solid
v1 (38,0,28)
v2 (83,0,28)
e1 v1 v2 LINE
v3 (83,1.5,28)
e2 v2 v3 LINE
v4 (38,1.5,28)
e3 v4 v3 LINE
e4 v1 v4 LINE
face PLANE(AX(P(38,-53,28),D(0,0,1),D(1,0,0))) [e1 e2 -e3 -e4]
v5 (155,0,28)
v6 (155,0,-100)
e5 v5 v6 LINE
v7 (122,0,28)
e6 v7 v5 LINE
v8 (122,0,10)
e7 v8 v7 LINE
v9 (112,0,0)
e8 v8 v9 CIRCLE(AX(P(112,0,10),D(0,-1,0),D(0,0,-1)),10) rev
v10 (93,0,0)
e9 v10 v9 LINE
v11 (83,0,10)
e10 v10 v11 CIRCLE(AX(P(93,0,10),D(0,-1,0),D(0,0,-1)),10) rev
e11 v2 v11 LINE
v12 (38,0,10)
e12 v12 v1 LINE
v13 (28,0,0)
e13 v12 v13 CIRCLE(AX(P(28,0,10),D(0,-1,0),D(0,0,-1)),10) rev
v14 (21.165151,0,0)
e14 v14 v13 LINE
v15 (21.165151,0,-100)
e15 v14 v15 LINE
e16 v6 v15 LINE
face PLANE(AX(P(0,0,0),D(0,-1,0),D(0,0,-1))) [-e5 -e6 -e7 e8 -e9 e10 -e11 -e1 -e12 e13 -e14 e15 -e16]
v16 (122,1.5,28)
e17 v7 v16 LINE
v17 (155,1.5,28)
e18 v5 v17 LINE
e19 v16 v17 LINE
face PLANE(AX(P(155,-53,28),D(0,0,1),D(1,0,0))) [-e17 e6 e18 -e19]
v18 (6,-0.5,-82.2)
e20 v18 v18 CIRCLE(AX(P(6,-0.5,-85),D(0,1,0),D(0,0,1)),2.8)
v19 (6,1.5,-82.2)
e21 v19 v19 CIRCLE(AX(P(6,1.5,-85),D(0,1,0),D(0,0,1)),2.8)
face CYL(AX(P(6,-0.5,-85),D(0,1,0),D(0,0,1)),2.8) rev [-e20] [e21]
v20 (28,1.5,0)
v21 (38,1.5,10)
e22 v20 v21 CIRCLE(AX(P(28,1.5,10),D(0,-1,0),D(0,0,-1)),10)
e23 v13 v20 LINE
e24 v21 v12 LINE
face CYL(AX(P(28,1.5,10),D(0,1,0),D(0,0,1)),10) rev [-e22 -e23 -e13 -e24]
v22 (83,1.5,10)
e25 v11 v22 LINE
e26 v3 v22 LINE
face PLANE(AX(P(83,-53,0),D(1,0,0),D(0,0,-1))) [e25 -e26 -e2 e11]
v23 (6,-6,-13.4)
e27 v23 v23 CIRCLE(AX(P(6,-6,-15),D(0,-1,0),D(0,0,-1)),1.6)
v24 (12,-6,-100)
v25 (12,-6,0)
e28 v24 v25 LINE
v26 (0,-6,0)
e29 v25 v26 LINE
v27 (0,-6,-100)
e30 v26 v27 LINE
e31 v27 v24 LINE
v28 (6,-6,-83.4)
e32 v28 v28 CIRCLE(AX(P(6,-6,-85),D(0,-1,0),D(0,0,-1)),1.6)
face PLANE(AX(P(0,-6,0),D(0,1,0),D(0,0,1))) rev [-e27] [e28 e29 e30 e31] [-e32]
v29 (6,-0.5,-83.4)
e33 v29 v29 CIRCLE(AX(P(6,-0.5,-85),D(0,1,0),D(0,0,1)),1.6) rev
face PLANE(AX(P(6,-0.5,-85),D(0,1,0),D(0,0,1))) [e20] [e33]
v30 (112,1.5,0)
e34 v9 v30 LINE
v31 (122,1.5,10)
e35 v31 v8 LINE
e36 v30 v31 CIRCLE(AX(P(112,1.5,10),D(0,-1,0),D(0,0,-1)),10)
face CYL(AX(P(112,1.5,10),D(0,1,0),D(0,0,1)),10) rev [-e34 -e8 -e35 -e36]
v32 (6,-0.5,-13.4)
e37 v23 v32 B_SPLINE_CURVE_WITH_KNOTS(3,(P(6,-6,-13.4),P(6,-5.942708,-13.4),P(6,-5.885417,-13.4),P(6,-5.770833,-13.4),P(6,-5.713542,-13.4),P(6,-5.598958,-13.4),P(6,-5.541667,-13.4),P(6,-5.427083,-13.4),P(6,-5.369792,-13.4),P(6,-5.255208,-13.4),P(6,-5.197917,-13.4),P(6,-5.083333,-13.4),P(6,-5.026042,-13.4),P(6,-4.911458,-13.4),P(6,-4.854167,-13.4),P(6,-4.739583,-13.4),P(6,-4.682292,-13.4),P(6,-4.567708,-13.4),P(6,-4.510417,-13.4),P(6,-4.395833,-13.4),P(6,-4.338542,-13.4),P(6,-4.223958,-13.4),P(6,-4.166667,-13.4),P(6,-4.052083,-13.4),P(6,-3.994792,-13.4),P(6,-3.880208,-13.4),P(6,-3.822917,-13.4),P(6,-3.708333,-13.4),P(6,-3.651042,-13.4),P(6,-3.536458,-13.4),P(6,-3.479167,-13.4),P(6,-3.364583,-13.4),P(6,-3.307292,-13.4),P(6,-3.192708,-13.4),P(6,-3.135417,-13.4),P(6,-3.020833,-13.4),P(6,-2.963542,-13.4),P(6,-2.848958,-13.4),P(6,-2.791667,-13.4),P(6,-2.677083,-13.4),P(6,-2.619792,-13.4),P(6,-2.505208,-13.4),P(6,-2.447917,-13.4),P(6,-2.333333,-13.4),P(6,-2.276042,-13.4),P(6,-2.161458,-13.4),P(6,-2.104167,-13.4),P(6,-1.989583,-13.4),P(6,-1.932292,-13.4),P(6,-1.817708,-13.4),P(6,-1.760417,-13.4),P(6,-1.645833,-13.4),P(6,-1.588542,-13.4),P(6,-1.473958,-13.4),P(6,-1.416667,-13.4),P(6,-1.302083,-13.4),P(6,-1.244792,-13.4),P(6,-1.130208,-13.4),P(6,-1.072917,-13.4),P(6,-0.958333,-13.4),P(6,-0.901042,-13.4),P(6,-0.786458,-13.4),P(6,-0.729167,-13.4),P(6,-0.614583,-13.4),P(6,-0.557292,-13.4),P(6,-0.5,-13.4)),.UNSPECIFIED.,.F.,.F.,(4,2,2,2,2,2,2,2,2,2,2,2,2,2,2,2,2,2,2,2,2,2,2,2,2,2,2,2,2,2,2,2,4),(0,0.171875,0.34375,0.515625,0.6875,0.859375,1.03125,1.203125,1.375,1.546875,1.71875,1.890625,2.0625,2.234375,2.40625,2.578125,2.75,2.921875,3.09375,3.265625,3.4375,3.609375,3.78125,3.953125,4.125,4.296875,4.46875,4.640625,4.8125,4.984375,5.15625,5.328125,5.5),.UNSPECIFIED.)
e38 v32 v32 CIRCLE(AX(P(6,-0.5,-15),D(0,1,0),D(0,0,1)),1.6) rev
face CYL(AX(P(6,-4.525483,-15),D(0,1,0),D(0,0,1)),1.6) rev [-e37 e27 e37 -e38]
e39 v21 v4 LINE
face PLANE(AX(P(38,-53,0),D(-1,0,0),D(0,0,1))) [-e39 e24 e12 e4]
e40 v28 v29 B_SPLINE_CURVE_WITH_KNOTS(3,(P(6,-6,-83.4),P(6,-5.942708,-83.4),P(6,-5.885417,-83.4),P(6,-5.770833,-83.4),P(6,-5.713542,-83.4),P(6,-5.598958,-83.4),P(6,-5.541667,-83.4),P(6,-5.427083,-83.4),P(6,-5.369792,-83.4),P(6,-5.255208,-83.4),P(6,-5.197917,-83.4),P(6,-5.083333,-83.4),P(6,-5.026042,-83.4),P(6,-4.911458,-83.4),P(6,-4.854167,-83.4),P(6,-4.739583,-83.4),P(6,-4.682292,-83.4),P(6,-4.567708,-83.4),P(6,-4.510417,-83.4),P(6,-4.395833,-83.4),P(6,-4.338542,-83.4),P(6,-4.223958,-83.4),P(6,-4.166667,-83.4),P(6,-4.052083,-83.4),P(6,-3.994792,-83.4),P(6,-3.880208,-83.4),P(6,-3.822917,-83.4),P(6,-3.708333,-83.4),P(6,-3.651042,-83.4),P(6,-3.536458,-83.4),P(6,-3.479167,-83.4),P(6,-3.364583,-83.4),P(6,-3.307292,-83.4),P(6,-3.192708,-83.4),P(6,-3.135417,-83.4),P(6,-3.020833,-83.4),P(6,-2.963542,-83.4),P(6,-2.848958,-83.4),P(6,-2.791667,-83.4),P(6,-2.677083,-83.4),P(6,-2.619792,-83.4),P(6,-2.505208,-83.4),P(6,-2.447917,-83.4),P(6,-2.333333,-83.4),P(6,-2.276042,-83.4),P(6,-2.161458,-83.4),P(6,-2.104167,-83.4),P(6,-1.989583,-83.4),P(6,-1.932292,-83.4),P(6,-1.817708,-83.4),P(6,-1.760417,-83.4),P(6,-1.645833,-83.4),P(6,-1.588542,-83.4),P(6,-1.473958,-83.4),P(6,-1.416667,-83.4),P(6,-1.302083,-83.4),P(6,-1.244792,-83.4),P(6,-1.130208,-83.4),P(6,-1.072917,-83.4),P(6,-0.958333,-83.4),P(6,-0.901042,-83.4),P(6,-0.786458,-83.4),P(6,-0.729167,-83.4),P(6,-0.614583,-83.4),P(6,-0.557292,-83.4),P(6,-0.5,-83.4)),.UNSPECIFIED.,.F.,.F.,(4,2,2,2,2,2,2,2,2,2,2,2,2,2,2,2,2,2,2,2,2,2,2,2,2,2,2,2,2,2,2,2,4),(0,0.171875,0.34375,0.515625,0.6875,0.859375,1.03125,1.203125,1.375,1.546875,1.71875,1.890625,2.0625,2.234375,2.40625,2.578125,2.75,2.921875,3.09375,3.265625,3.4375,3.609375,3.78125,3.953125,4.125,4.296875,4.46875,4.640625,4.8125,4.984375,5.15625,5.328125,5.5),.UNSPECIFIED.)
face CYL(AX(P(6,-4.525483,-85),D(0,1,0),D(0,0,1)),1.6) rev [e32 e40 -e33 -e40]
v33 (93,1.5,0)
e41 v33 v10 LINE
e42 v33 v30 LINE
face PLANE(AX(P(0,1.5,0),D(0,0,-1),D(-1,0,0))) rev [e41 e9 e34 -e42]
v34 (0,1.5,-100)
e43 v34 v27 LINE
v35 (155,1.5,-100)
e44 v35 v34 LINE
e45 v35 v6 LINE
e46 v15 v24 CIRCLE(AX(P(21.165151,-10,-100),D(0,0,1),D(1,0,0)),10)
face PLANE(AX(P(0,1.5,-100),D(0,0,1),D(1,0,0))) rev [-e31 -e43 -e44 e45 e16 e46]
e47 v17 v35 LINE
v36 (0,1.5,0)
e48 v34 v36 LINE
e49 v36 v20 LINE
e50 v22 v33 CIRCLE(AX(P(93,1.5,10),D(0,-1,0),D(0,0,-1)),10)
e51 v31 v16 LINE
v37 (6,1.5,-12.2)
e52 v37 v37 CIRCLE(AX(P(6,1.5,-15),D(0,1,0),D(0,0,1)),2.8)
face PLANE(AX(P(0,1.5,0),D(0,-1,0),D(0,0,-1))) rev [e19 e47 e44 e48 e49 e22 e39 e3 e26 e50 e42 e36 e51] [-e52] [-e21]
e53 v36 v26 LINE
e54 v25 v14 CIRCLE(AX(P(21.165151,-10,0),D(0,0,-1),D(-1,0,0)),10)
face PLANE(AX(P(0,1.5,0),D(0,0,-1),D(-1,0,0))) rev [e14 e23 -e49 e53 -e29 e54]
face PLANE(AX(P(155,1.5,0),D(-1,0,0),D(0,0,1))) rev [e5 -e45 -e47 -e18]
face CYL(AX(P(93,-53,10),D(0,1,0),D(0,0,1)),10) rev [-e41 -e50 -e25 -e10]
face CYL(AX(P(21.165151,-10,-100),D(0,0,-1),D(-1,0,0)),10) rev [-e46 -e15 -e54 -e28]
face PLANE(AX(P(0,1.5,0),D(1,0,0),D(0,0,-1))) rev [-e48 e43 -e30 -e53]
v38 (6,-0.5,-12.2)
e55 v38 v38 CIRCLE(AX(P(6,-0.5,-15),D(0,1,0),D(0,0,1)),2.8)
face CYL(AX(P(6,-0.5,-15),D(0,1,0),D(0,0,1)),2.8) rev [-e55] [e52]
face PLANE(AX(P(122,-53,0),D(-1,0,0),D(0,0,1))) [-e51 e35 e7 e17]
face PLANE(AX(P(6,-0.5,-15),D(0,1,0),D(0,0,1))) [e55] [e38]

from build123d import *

# Parameters (mm, degrees)
CROQUIS1_W              = 155
CROQUIS1_H              = 100
SALIENTE_EXTRUIR1_DEPTH = 1.5
CROQUIS2_R              = 1.6
CORTAR_EXTRUIR1_DEPTH   = 1.5
CROQUIS3_W              = 12
CROQUIS3_H              = 100
CROQUIS3_R              = 1.6
SALIENTE_EXTRUIR2_DEPTH = 6
CROQUIS4_W              = 45
CROQUIS4_H              = 28
CROQUIS4_W_2            = 33
SALIENTE_EXTRUIR3_DEPTH = 1.5
REDONDEO1_R             = 10
REDONDEO2_R             = 10
CROQUIS5_R              = 2.8
CORTAR_EXTRUIR2_DEPTH   = 2


with BuildPart() as part:
    # Croquis1 → Saliente-Extruir1 (new body)
    with BuildSketch(Plane(origin=(0, 0, 0), x_dir=(1, 0, 0), z_dir=(0, 1, 0))):
        with Locations((77.5, 50)):
            Rectangle(CROQUIS1_W, CROQUIS1_H)
    extrude(amount=SALIENTE_EXTRUIR1_DEPTH)

    # Croquis2 → Cortar-Extruir1 (cut)
    with BuildSketch(Plane(origin=(0, 1.5, 0), x_dir=(1, 0, 0), z_dir=(0, 1, 0))):
        with Locations(Location((6, 85, 0), (0, 0, 270))):
            Circle(CROQUIS2_R)
        with Locations(Location((6, 15, 0), (0, 0, 270))):
            Circle(CROQUIS2_R)
    extrude(amount=-CORTAR_EXTRUIR1_DEPTH, mode=Mode.SUBTRACT)

    # Croquis3 → Saliente-Extruir2 (add)
    with BuildSketch(Plane.XZ):
        with Locations((6, -50)):
            Rectangle(CROQUIS3_W, CROQUIS3_H)
        with Locations(Location((6, -15, 0), (0, 0, 90))):
            Circle(CROQUIS3_R, mode=Mode.SUBTRACT)
        with Locations(Location((6, -85, 0), (0, 0, 90))):
            Circle(CROQUIS3_R, mode=Mode.SUBTRACT)
    extrude(amount=SALIENTE_EXTRUIR2_DEPTH)

    # Croquis4 → Saliente-Extruir3 (add)
    with BuildSketch(Plane(origin=(0, 1.5, 0), x_dir=(1, 0, 0), z_dir=(0, 1, 0))):
        with Locations((60.5, -14)):
            Rectangle(CROQUIS4_W, CROQUIS4_H)
        with Locations((138.5, -14)):
            Rectangle(CROQUIS4_W_2, CROQUIS4_H)
    extrude(amount=-SALIENTE_EXTRUIR3_DEPTH)

    # Redondeo1
    redondeo1_edges = [part.edges().sort_by_distance(p)[0] for p in [
        (83, 0.75, 0),
        (38, 0.75, 0),
        (122, 0.75, 0),
    ]]
    fillet(redondeo1_edges, radius=REDONDEO1_R)

    # Redondeo2
    # the kernel refuses this fillet: 10 mm, written as the material it adds along each edge
    with BuildSketch(Plane(origin=(12, 0, -100), x_dir=(0, -1, 0), z_dir=(0, 0, 1))) as redondeo2_piece_1:
        with BuildLine():
            CenterArc((10, 9.16515139), REDONDEO2_R, 180, 66.421821522)
            Line((0, 9.16515139), (-0.2, 9.16515139))
            Line((-0.2, 9.16515139), (-0.2, 0))
            Line((-0.2, 0), (0, -0.2))
            ThreePointArc((0, -0.2), (3, -0.2), (5.92, -0.183303028))
            Line((5.92, -0.183303028), (6, 0))
        make_face()
    extrude(amount=100)

    # Croquis5 → Cortar-Extruir2 (cut)
    with BuildSketch(Plane(origin=(0, 1.5, 0), x_dir=(1, 0, 0), z_dir=(0, 1, 0))):
        with Locations(Location((6, 85, 0), (0, 0, 270))):
            Circle(CROQUIS5_R)
        with Locations(Location((6, 15, 0), (0, 0, 270))):
            Circle(CROQUIS5_R)
    extrude(amount=-CORTAR_EXTRUIR2_DEPTH, mode=Mode.SUBTRACT)


solid = part.part
